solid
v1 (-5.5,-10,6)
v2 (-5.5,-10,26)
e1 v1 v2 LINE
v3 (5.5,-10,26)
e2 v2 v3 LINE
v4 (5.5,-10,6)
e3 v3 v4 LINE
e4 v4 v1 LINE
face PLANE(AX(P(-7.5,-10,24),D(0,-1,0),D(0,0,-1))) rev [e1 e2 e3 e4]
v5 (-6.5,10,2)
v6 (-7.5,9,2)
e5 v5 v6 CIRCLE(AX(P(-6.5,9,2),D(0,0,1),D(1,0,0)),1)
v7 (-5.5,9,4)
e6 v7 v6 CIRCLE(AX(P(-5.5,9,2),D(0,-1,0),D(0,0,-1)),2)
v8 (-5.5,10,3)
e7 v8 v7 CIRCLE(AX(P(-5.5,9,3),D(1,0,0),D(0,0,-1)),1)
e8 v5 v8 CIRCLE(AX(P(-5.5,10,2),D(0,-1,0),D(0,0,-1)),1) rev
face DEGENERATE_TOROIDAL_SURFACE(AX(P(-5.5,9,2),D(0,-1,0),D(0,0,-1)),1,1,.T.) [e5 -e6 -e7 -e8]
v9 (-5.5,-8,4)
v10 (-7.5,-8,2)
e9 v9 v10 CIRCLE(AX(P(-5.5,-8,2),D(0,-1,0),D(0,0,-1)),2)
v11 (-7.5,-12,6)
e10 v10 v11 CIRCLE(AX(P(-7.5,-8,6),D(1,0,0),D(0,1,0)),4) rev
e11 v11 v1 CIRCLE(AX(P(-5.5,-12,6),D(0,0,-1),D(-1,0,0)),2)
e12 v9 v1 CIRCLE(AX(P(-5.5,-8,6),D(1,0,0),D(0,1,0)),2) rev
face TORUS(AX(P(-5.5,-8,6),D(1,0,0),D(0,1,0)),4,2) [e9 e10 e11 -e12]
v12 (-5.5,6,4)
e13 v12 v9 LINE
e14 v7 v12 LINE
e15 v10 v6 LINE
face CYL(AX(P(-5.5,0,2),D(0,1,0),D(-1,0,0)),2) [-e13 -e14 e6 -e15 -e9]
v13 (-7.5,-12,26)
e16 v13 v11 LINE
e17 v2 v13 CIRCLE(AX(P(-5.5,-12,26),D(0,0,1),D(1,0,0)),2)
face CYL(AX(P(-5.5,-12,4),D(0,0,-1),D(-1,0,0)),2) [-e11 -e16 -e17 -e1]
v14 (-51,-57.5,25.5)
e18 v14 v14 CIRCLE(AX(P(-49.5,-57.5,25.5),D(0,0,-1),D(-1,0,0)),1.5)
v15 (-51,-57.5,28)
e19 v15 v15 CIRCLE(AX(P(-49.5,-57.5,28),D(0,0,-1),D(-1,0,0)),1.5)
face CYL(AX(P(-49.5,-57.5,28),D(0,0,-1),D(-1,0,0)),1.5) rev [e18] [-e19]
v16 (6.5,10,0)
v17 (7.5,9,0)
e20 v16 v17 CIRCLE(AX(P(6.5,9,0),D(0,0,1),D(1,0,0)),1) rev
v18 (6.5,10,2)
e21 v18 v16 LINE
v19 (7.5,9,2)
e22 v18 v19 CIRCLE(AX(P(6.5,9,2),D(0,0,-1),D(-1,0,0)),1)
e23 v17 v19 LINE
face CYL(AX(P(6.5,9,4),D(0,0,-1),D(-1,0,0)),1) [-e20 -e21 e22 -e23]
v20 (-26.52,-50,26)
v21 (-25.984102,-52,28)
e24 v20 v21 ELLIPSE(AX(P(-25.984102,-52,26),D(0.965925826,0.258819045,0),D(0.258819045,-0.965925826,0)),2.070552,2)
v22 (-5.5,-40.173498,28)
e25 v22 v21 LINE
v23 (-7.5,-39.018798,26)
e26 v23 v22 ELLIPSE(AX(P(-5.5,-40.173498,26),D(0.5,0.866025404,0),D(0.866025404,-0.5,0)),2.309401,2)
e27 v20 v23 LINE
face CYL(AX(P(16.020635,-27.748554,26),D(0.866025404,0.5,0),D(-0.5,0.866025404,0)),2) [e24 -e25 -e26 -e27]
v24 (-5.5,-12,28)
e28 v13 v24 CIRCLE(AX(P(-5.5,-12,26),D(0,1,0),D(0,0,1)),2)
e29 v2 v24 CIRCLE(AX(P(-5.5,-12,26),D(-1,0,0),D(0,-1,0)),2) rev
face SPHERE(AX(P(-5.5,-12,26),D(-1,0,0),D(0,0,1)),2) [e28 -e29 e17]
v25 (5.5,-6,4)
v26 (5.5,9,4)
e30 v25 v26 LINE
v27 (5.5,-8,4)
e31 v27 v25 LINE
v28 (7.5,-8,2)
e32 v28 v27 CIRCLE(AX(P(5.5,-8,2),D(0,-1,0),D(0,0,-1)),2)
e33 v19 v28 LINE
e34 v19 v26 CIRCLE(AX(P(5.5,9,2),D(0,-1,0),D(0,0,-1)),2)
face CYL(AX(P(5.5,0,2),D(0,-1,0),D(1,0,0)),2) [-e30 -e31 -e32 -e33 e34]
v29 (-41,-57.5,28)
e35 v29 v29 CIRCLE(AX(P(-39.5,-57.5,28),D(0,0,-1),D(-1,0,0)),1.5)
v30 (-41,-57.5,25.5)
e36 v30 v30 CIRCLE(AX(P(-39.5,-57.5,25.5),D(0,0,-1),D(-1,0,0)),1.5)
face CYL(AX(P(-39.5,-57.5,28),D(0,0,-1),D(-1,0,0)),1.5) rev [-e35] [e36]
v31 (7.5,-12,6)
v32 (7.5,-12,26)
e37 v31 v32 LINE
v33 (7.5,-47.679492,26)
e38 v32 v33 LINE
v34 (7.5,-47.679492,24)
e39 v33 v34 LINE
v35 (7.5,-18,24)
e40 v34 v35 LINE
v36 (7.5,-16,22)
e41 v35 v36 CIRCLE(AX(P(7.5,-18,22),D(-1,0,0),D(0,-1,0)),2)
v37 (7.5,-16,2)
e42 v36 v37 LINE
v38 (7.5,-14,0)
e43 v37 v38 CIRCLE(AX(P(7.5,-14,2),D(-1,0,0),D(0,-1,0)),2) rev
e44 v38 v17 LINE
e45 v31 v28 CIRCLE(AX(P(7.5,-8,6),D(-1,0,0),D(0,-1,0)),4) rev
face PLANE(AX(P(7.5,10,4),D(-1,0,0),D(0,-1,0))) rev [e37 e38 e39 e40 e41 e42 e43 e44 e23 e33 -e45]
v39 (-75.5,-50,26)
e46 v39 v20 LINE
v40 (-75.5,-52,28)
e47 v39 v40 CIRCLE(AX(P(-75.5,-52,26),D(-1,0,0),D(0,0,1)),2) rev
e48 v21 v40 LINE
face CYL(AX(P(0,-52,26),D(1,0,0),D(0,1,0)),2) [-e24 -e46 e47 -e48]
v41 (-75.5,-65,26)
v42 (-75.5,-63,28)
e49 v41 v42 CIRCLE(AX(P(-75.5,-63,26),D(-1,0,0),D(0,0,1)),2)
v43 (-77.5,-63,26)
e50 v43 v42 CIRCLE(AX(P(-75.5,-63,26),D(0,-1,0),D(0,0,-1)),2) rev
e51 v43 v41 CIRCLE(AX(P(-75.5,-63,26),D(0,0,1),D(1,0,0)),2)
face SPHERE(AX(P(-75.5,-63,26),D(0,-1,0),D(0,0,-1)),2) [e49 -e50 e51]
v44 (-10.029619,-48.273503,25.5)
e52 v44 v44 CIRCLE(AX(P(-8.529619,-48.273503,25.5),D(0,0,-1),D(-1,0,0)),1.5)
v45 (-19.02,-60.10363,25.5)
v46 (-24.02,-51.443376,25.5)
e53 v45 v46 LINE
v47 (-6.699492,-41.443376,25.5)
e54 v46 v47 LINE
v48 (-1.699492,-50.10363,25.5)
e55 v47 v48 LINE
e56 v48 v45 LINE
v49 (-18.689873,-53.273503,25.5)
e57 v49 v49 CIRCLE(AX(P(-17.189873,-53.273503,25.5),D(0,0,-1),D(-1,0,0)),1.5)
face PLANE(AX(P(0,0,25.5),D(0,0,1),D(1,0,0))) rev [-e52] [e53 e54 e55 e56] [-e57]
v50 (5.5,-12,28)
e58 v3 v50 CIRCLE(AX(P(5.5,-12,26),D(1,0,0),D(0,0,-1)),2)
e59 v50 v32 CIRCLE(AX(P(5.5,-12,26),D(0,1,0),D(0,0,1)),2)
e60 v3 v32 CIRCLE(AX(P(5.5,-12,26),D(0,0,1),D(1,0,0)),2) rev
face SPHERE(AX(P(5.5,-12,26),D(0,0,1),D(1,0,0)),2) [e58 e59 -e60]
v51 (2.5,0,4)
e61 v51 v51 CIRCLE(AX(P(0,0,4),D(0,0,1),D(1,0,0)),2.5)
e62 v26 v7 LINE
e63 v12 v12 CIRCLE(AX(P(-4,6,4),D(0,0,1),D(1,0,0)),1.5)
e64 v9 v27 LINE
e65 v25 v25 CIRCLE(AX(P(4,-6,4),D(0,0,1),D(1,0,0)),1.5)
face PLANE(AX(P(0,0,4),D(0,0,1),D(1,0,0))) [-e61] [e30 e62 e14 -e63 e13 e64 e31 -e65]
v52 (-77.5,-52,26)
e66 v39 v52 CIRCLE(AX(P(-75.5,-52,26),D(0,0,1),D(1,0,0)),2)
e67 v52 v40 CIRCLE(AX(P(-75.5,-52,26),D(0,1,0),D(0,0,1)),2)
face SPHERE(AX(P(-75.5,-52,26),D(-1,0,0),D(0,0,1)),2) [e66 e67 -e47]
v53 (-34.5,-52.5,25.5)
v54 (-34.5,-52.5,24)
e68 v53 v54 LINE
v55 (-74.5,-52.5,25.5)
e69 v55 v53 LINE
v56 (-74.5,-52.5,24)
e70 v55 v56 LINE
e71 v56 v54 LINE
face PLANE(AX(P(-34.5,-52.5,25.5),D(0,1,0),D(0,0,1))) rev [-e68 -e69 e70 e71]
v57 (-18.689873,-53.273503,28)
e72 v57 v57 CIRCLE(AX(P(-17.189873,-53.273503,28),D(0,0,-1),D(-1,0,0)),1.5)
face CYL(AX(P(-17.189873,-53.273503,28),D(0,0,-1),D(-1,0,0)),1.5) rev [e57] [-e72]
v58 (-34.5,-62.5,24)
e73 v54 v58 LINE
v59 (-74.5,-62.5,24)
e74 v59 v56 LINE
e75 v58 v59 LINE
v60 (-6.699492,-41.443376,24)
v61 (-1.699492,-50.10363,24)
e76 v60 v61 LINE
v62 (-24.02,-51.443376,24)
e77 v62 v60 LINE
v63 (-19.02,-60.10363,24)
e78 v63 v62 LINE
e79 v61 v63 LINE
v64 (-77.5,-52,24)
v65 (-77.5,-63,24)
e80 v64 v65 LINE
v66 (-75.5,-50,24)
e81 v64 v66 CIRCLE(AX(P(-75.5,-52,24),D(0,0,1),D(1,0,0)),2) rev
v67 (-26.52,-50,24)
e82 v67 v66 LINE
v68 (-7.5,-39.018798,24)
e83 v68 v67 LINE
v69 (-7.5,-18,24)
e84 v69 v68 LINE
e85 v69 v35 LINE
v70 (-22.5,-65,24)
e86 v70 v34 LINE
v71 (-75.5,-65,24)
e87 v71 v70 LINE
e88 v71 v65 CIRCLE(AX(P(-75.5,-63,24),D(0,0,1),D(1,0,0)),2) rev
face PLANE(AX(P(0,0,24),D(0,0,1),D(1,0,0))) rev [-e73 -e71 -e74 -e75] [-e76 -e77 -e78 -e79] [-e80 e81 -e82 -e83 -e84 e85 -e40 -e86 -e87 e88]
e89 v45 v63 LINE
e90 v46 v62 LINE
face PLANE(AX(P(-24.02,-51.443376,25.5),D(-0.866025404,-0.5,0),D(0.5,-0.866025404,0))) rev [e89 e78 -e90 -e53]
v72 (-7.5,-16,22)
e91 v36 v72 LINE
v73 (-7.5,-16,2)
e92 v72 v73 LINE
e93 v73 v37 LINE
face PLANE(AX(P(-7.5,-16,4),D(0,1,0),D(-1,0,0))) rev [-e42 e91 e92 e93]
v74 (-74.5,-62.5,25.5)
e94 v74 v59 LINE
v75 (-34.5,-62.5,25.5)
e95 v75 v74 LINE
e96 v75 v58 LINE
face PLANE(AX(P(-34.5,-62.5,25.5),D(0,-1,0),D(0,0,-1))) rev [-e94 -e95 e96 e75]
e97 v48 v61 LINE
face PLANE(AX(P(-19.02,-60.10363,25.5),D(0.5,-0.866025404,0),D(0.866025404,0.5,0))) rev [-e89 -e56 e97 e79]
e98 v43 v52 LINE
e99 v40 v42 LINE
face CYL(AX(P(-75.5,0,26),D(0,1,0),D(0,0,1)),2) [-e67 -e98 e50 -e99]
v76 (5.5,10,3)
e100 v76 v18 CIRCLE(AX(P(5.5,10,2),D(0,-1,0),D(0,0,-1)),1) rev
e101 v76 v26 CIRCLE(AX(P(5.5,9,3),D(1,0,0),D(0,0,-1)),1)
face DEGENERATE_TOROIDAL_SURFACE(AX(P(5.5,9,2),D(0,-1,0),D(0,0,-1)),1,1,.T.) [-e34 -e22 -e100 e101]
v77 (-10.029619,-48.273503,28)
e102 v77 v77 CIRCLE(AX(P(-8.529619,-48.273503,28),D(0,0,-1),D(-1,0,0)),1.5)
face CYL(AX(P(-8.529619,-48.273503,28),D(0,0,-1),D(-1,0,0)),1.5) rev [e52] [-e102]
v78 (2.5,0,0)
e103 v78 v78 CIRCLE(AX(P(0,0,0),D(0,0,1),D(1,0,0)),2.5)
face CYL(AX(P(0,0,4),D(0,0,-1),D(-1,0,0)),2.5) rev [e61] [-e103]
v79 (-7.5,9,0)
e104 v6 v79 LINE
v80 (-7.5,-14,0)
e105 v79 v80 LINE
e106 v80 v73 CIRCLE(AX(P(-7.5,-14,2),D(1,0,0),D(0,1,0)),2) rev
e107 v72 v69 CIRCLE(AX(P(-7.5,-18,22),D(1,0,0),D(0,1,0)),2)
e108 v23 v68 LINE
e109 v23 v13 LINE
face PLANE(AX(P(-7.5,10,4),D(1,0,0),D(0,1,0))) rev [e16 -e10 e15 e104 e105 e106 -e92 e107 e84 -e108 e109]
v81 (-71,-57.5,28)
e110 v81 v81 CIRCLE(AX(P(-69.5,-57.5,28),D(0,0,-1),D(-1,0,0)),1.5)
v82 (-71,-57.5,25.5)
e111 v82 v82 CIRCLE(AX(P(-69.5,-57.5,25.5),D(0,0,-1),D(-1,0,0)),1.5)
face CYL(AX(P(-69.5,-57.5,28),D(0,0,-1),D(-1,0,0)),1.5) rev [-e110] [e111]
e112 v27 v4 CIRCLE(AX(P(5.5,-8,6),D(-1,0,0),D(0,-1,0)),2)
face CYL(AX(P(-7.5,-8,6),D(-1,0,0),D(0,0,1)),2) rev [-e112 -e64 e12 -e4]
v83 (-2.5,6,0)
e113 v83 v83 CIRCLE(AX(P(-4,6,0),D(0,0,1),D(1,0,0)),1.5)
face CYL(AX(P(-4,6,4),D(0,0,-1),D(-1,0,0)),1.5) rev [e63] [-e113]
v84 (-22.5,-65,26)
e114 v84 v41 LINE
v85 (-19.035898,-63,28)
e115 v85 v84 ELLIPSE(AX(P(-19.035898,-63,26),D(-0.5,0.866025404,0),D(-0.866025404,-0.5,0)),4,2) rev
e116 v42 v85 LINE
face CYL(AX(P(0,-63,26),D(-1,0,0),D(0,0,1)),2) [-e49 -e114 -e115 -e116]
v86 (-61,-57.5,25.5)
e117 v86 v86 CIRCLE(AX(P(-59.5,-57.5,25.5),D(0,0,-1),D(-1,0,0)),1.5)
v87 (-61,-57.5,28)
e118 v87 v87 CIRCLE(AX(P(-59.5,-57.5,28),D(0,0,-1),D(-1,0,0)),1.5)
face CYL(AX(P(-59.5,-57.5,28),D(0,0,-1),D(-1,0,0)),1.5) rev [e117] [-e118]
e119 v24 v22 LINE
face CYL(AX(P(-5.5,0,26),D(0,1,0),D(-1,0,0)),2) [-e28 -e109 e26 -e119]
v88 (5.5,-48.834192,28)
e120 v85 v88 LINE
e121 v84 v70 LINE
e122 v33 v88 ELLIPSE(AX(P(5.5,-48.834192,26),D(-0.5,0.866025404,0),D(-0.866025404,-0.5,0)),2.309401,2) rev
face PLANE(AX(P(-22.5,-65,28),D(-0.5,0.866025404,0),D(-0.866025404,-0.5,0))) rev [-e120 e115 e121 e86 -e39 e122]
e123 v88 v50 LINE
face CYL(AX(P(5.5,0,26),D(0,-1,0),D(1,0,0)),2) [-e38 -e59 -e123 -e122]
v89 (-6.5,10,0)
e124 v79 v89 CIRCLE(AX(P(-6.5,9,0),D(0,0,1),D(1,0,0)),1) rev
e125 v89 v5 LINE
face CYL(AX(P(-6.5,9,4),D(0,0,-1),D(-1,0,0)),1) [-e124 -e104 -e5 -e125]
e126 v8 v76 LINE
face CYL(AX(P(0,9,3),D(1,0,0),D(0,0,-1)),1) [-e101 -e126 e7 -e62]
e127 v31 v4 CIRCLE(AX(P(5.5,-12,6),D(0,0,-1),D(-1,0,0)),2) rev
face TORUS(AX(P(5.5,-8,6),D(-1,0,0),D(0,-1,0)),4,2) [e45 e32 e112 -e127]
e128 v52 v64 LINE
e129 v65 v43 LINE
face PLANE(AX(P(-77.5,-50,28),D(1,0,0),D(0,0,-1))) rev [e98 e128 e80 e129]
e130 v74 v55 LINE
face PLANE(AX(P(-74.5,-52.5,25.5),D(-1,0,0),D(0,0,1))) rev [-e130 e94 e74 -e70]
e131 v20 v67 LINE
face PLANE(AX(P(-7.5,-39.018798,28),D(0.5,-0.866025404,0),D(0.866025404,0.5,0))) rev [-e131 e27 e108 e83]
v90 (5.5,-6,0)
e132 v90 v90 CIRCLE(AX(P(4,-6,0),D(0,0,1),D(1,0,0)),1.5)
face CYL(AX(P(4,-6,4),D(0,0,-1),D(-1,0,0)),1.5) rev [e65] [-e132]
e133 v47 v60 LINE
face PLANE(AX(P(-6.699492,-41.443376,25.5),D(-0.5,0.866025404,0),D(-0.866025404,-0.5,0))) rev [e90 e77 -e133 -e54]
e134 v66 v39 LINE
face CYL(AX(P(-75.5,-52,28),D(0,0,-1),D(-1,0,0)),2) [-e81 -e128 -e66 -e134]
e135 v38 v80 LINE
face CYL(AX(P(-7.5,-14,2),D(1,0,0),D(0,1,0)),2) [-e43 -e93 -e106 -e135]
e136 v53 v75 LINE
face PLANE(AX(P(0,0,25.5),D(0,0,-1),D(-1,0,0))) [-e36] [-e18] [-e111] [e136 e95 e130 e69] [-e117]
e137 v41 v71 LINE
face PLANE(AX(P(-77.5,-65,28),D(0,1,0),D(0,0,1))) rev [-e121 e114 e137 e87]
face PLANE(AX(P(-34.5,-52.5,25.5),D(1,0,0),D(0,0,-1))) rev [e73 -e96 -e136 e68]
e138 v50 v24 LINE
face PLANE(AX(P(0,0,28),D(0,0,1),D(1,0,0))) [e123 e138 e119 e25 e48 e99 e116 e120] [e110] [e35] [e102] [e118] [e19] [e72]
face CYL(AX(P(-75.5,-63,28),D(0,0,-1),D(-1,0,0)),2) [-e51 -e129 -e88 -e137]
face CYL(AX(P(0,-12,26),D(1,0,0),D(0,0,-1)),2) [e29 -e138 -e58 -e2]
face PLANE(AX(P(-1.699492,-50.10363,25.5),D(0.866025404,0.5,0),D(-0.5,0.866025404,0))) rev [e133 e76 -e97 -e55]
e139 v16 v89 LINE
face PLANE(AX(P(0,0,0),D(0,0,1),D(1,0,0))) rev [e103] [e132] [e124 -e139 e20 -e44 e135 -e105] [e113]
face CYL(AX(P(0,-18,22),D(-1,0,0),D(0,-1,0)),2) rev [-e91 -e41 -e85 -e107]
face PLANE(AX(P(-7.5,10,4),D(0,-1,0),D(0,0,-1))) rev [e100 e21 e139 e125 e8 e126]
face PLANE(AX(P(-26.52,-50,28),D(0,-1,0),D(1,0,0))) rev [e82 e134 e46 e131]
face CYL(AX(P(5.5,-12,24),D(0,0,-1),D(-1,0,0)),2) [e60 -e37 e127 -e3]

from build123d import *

# Parameters (mm, degrees)
SKETCH_1_W          = 15
SKETCH_1_H          = 26
SKETCH_1_R          = 2.5
SKETCH_1_R_2        = 1.5
EXTRUDE_1_DEPTH     = 4
SKETCH_14_W         = 15
SKETCH_14_H         = 6
EXTRUDE_4_DEPTH     = 20
EXTRUDE_5_DEPTH     = 4
SKETCH_17_W         = 40
SKETCH_17_H         = 10
CUT_EXTRUDE_3_DEPTH = 1.5
SKETCH_18_R         = 1.5
CUT_EXTRUDE_4_DEPTH = 2.5
CUT_EXTRUDE_5_DEPTH = 1.5
SKETCH_20_R         = 1.5
CUT_EXTRUDE_6_DEPTH = 2.5
FILLET_1_R          = 2
FILLET_2_R          = 1


with BuildPart() as part:
    # 草图1 → 凸台-拉伸1 (new body)
    with BuildSketch(Plane.XY):
        with Locations((0, -3)):
            Rectangle(SKETCH_1_W, SKETCH_1_H)
        Circle(SKETCH_1_R, mode=Mode.SUBTRACT)
        with Locations((-4, 6)):
            Circle(SKETCH_1_R_2, mode=Mode.SUBTRACT)
        with Locations((4, -6)):
            Circle(SKETCH_1_R_2, mode=Mode.SUBTRACT)
    extrude(amount=EXTRUDE_1_DEPTH)

    # 草图14 → 凸台-拉伸4 (add)
    with BuildSketch(Plane.XY.offset(4)):
        with Locations((0, -13)):
            Rectangle(SKETCH_14_W, SKETCH_14_H)
    extrude(amount=EXTRUDE_4_DEPTH)

    # 草图15 → 凸台-拉伸5 (add)
    with BuildSketch(Plane.XY.offset(24)):
        Polygon((-7.5, -10), (-7.5, -39.01879788), (-26.52, -50), (-77.5, -50), (-77.5, -65), (-22.5, -65), (7.5, -47.679491924), (7.5, -10), align=None)
    extrude(amount=EXTRUDE_5_DEPTH)

    # 草图17 → 切除-拉伸3 (cut)
    with BuildSketch(Plane(origin=(0, 0, 24), x_dir=(-1, 0, 0), z_dir=(0, 0, -1))):
        with Locations((54.5, -57.5)):
            Rectangle(SKETCH_17_W, SKETCH_17_H)
    extrude(amount=-CUT_EXTRUDE_3_DEPTH, mode=Mode.SUBTRACT)

    # 草图18 → 切除-拉伸4 (cut)
    with BuildSketch(Plane(origin=(0, 0, 25.5), x_dir=(-1, 0, 0), z_dir=(0, 0, -1))):
        with Locations((39.5, -57.5)):
            Circle(SKETCH_18_R)
        with Locations((49.5, -57.5)):
            Circle(SKETCH_18_R)
        with Locations((59.5, -57.5)):
            Circle(SKETCH_18_R)
        with Locations((69.5, -57.5)):
            Circle(SKETCH_18_R)
    extrude(amount=-CUT_EXTRUDE_4_DEPTH, mode=Mode.SUBTRACT)

    # 草图19 → 切除-拉伸5 (cut)
    with BuildSketch(Plane(origin=(0, 0, 24), x_dir=(-1, 0, 0), z_dir=(0, 0, -1))):
        Polygon((6.699491924, -41.443375673), (24.02, -51.443375673), (19.02, -60.103629711), (1.699491924, -50.103629711), align=None)
    extrude(amount=-CUT_EXTRUDE_5_DEPTH, mode=Mode.SUBTRACT)

    # 草图20 → 切除-拉伸6 (cut)
    with BuildSketch(Plane(origin=(0, 0, 25.5), x_dir=(-1, 0, 0), z_dir=(0, 0, -1))):
        with Locations((8.529618943, -48.273502692)):
            Circle(SKETCH_20_R)
        with Locations((17.189872981, -53.273502692)):
            Circle(SKETCH_20_R)
    extrude(amount=-CUT_EXTRUDE_6_DEPTH, mode=Mode.SUBTRACT)

    # 圆角1
    fillet_1_edges = [part.edges().sort_by_distance(p)[0] for p in [
        (-7.5, 0, 4),
        (7.5, 0, 4),
        (-7.5, -10, 16),
        (0, -10, 4),
        (7.5, -10, 16),
        (0, -16, 24),
        (-77.5, -50, 26),
        (-77.5, -65, 26),
        (0, -10, 28),
        (-7.5, -24.50939894, 28),
        (-17.01, -44.50939894, 28),
        (-52.01, -50, 28),
        (-77.5, -57.5, 28),
        (-50, -65, 28),
        (7.5, -28.839745962, 28),
        (0, -16, 0),
    ]]
    fillet(fillet_1_edges, radius=FILLET_1_R - 0.0001)  # a hair under: the kernel refuses the full size

    # 圆角2
    fillet_2_edges = [part.edges().sort_by_distance(p)[0] for p in [
        (7.5, 10, 1.00005),
        (-7.5, 10, 1.00005),
        (0, 10, 4),
        (-6.914242852, 10, 3.414242852),
        (6.914242852, 10, 3.414242852),
    ]]
    fillet(fillet_2_edges, radius=FILLET_2_R)


solid = part.part
